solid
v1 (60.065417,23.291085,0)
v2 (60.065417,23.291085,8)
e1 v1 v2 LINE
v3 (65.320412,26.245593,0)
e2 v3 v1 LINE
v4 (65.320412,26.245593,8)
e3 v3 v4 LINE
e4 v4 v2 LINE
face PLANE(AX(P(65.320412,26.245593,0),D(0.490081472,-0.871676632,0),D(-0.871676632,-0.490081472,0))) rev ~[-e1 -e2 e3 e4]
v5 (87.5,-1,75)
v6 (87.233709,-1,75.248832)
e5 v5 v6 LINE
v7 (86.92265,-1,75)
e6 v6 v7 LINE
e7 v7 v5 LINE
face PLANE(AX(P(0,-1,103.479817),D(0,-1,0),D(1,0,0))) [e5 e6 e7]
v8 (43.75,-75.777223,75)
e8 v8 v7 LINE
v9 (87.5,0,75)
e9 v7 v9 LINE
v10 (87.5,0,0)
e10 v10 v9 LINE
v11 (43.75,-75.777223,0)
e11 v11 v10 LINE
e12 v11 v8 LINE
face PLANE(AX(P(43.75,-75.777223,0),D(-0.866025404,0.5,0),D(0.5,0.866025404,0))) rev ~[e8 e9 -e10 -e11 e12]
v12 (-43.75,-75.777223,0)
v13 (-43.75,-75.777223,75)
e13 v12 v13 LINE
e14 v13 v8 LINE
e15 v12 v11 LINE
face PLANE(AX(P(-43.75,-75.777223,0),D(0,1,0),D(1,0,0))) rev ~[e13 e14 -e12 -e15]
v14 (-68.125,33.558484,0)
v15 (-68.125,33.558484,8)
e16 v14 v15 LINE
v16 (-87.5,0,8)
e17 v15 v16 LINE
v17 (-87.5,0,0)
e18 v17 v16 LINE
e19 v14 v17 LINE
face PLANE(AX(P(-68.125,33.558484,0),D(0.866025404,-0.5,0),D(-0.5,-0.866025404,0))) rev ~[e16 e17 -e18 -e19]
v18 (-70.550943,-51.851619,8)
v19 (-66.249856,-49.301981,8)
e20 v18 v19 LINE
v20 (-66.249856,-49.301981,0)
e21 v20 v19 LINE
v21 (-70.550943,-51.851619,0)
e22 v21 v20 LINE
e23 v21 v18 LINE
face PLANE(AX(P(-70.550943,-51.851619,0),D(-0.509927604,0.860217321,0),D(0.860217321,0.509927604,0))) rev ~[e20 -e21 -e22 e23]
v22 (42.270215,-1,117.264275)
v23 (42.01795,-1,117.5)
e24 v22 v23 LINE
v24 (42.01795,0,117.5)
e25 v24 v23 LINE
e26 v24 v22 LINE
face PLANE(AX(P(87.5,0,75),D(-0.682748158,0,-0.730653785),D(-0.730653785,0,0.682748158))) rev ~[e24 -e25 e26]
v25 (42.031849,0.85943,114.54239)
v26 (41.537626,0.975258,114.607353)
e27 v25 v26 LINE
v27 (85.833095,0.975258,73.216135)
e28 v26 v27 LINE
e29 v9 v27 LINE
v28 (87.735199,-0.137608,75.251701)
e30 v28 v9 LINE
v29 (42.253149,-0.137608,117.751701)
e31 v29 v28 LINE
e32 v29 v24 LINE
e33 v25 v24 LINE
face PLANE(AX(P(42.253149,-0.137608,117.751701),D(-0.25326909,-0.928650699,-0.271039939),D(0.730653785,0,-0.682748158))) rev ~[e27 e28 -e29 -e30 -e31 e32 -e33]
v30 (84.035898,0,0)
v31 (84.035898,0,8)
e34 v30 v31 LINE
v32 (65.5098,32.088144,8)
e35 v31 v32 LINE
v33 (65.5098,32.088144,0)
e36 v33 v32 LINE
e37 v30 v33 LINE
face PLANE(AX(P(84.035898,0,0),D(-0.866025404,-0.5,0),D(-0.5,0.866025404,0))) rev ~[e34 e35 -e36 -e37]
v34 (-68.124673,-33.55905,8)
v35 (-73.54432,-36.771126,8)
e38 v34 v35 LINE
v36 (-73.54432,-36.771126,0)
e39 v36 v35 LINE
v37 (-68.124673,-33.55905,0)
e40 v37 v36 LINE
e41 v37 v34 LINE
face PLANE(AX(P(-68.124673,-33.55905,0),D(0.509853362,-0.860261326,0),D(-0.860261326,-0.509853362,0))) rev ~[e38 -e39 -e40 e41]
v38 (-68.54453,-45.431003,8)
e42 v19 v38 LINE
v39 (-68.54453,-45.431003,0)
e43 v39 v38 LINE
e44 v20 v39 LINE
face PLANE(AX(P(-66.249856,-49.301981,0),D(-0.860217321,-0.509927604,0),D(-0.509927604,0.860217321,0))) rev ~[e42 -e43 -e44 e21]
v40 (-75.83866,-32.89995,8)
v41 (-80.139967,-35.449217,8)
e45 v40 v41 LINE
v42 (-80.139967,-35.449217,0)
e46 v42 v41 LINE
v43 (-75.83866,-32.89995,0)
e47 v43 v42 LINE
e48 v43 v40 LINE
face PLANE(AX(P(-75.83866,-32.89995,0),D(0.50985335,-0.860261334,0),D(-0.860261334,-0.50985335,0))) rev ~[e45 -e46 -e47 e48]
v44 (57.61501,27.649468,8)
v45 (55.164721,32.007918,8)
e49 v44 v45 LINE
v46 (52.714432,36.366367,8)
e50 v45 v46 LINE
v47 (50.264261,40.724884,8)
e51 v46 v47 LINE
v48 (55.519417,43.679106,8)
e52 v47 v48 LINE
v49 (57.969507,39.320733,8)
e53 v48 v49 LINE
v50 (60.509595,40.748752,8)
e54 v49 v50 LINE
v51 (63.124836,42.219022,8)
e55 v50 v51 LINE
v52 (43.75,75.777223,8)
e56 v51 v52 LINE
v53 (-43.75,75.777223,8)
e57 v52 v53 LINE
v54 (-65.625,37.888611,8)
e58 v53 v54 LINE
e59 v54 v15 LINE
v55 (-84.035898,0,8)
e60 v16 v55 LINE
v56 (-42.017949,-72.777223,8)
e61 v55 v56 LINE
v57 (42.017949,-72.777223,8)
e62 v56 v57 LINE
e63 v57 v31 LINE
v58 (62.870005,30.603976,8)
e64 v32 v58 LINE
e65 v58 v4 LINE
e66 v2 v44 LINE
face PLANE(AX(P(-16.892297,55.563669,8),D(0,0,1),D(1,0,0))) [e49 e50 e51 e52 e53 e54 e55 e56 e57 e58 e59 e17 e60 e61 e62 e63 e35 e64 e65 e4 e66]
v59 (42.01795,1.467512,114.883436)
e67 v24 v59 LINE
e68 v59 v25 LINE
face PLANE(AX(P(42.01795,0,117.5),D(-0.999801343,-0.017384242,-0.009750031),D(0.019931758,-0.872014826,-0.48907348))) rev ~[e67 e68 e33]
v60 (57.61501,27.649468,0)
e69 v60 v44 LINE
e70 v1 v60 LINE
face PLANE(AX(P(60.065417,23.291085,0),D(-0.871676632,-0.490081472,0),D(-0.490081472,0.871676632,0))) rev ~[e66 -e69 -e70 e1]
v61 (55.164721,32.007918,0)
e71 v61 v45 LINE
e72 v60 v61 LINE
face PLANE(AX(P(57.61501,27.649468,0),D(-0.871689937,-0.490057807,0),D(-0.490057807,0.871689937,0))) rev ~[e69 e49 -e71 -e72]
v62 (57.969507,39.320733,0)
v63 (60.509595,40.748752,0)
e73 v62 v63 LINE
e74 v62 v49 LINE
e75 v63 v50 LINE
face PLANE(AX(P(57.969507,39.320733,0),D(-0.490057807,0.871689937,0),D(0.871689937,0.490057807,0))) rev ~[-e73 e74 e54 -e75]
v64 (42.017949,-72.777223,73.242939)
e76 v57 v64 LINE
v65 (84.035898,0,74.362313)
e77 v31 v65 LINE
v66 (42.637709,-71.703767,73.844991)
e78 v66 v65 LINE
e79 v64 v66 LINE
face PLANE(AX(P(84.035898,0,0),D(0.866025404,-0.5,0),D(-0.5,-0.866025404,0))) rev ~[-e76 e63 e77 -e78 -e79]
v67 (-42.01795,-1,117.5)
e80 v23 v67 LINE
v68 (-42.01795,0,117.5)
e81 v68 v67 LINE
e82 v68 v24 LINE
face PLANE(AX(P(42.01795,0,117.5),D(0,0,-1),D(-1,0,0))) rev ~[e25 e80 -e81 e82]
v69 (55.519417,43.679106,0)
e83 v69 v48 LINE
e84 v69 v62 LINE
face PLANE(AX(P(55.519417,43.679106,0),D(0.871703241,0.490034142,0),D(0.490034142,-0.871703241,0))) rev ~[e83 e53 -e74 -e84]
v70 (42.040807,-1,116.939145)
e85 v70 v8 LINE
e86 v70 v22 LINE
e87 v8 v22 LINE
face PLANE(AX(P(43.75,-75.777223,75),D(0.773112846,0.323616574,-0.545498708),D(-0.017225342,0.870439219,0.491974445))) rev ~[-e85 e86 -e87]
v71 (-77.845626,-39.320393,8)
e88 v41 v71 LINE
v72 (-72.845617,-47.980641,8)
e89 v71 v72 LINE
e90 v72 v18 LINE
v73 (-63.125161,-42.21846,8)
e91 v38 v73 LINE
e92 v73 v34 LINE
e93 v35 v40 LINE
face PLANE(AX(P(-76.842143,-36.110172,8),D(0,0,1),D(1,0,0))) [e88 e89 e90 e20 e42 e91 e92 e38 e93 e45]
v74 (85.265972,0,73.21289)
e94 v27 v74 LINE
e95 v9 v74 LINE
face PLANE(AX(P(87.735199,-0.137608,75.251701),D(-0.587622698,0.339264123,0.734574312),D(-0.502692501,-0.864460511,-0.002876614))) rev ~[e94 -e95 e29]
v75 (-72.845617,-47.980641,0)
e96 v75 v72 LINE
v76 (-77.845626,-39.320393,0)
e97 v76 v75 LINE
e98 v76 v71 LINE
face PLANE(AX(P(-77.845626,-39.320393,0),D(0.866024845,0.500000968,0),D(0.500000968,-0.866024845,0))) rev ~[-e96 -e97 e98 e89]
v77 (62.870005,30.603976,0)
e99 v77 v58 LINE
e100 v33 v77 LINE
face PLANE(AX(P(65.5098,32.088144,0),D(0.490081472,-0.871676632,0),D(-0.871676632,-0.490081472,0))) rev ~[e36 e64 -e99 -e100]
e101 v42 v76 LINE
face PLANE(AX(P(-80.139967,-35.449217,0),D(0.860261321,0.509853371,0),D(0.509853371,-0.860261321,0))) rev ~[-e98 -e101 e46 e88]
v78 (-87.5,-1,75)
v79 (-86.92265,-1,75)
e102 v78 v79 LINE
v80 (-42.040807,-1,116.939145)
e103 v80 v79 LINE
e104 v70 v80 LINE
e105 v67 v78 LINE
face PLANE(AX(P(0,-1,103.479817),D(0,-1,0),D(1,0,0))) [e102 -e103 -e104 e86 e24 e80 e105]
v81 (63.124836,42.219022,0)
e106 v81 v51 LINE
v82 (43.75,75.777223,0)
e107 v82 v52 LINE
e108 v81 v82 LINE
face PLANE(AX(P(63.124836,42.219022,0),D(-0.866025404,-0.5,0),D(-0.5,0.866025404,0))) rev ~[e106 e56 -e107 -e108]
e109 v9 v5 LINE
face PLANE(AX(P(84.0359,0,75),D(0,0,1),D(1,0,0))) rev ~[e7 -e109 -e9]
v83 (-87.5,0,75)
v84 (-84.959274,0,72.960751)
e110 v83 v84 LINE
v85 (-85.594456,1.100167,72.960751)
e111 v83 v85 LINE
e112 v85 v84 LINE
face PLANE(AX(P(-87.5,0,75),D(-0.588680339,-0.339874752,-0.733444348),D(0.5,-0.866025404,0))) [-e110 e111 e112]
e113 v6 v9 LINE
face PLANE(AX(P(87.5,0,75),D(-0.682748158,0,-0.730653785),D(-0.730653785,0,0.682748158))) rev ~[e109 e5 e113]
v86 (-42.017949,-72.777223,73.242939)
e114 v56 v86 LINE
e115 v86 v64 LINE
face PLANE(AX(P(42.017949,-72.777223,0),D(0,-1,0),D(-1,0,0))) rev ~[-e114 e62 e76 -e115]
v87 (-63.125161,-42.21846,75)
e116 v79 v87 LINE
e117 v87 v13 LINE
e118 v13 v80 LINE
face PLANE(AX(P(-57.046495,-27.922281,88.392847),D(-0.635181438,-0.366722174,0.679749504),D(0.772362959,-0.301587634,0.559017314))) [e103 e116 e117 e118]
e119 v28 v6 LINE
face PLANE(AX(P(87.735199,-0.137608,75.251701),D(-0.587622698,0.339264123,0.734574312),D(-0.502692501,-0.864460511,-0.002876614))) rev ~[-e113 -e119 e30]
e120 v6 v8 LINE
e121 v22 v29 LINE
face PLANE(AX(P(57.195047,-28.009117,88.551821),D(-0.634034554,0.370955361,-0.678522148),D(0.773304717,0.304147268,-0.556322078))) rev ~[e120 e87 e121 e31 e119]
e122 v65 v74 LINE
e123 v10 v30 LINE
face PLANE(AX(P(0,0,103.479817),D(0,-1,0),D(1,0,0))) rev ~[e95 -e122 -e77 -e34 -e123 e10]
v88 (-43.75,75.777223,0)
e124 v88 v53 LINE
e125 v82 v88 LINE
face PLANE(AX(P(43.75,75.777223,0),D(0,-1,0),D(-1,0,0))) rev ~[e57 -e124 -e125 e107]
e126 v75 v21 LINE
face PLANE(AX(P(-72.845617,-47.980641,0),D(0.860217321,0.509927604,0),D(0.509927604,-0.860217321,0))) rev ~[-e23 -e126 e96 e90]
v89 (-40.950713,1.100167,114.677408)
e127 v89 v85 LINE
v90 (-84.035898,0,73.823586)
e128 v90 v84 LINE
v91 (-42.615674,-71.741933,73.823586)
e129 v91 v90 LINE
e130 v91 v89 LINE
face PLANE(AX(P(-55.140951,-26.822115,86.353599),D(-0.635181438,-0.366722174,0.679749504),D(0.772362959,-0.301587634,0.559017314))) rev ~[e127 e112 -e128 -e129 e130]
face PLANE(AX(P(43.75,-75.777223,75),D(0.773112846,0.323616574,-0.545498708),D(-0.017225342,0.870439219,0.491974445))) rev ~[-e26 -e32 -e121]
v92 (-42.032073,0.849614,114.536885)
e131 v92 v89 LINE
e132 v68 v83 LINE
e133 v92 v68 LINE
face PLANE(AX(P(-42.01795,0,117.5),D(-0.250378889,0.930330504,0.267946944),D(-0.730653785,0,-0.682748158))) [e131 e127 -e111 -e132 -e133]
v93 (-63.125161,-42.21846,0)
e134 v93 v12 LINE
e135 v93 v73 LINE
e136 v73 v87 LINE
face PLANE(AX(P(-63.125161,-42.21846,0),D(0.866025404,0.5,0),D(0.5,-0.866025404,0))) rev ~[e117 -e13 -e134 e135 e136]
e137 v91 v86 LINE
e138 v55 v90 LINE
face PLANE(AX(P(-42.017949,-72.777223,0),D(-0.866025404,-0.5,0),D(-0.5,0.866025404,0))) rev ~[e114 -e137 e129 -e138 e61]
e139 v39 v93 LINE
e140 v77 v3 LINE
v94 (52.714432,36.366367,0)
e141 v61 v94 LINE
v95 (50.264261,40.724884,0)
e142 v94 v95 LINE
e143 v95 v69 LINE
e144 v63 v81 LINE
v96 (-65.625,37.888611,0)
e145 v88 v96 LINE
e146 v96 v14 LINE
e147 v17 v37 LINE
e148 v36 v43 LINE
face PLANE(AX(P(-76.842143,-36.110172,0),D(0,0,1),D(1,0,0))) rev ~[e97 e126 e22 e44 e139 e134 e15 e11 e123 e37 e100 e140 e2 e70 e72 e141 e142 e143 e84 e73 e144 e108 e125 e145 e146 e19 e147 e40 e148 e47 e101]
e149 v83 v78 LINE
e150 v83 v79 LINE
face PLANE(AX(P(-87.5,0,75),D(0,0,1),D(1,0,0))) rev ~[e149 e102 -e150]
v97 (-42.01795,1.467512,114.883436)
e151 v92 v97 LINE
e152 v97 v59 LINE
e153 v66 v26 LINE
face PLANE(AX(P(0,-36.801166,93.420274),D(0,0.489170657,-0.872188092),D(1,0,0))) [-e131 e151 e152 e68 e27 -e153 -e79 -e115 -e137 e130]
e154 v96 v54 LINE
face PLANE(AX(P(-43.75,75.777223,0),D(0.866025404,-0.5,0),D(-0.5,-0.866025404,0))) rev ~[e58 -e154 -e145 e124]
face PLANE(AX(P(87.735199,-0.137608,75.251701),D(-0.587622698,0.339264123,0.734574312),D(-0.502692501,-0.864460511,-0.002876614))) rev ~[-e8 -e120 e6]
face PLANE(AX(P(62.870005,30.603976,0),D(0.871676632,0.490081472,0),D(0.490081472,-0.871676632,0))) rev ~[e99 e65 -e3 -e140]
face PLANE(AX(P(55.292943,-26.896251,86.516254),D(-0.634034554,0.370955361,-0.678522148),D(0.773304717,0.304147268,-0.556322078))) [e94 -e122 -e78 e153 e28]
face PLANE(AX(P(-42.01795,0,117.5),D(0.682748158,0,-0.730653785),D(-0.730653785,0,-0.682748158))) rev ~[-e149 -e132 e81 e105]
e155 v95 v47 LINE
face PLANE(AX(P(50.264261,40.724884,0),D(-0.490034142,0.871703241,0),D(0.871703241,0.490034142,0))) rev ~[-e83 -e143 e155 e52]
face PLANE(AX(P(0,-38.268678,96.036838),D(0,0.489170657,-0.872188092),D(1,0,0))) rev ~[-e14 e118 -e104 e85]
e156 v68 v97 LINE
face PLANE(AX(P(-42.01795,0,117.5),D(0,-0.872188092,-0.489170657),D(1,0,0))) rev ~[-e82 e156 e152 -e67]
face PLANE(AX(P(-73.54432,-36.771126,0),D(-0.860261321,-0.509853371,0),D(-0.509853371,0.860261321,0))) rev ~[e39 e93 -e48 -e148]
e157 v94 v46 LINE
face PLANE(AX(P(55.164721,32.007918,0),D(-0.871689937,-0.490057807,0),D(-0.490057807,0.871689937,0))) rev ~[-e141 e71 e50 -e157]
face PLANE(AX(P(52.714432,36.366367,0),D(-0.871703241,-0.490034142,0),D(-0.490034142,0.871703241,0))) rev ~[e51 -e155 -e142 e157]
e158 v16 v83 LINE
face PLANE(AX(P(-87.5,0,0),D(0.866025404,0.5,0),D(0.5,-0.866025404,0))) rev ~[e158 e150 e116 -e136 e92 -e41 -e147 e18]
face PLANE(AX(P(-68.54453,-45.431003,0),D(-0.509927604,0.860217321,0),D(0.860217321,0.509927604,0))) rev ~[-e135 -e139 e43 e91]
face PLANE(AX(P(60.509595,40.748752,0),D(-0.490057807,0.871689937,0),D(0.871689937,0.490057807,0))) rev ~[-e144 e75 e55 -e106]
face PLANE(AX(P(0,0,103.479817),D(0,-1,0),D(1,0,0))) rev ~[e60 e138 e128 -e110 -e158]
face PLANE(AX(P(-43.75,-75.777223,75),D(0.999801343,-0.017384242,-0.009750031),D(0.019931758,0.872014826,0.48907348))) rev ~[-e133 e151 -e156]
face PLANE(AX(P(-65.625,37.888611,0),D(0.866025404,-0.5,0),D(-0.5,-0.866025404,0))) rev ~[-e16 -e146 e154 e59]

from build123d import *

# Parameters (mm, degrees)
F0_W      = 50
F0_H      = 12.5
F1_DEPTH  = 8
F2_DEPTH  = 75
F4_DEPTH  = 8
F7_DEPTH  = 3
F8_DEPTH  = 1
F11_DEPTH = 3
F14_DEPTH = 3
F15_DEPTH = 8
F16_DEPTH = 8


# Not quite as in the source:
# - a feature names something its author has since deleted; it is built from what else it names


with BuildPart() as f1:
    # F0 (on Top) → F1 (new body)
    with BuildSketch(Plane.XY):
        Polygon((57.9695070384, 39.3207329262), (60.5095952989, 40.7487522591), (42.0179491924, 72.7772228311), (-42.0179491924, 72.7772228311), (-84.0358983849, 0), (-42.0179491924, -72.7772228311), (42.0179491924, -72.7772228311), (84.0358983849, 0), (65.5097997054, 32.0881441788), (62.870004896, 30.6039762231), (65.3204122546, 26.2455930623), (60.0654171506, 23.2910848888), (57.615009792, 27.6494680496), (55.164720758, 32.0079177338), (52.7144317239, 36.366367418), (50.2642610162, 40.7248836223), (55.5194165334, 43.6791064608), align=None)
        with Locations((0, 54.5829171234)):
            Rectangle(F0_W, F0_H, mode=Mode.SUBTRACT)
    extrude(amount=F1_DEPTH)

    # F0 (on Top) → F2 (join)
    with BuildSketch(Plane.XY):
        Polygon((-84.0358983849, 0), (-87.5, 0), (-68.1246734519, -33.5590499945), (-63.1251610364, -42.2184595112), (-43.75, -75.7772228311), (43.75, -75.7772228311), (87.5, 0), (84.0358983849, 0), (42.0179491924, -72.7772228311), (-42.0179491924, -72.7772228311), align=None)
    extrude(amount=F2_DEPTH)

    # F0 (on Top) → F4 (join)
    with BuildSketch(Plane.XY):
        Polygon((43.75, 75.7772228311), (-43.75, 75.7772228311), (-65.625, 37.8886114156), (-68.125, 33.5584843966), (-87.5, 0), (-84.0358983849, 0), (-42.0179491924, 72.7772228311), (42.0179491924, 72.7772228311), (60.5095952989, 40.7487522591), (63.1248363216, 42.2190219338), align=None)
    extrude(amount=F4_DEPTH)

    # F6 (on face) → F7 (join)
    with BuildSketch(Plane(origin=(0, -50.1312366318, 89.3836679776), x_dir=(1, 0, 0), z_dir=(0, 0.4891706574, -0.872188092))):
        Polygon((43.75, 29.4041920927), (0, 29.4041920927), (-43.75, 29.4041920927), (-42.01795, -57.4775522498), (42.01795, -57.4775522498), align=None)
    extrude(amount=F7_DEPTH)

    # F3 (on Front) → F8 (join)
    with BuildSketch(Plane.XZ):
        Polygon((-42.01795, 114.5), (0, 114.5), (42.01795, 114.5), (84.0359, 75), (87.5, 75), (42.01795, 117.5), (0, 117.5), (-42.01795, 117.5), (-87.5, 75), (-84.0359, 75), align=None)
    extrude(amount=F8_DEPTH)

    # F10 (on face) → F11 (join)
    with BuildSketch(Plane(origin=(-67.6846727043, -39.0777640058, 72.4338274863), x_dir=(0.7723629594, -0.3015876344, 0.5590173143), z_dir=(-0.6351814378, -0.3667221741, 0.6797495039))):
        Polygon((33.2314262259, 55.789645187), (-25.6554603702, 35.6104118215), (30.9888924807, -31.0804218073), align=None)
    extrude(amount=-F11_DEPTH)

    # F13 (on face) → F14 (join)
    with BuildSketch(Plane(origin=(67.6756688636, -39.5950852503, 72.4241918832), x_dir=(0.7733047167, 0.3041472681, -0.556322078), z_dir=(-0.6340345536, 0.3709553614, -0.6785221475))):
        Polygon((-30.939509805, 30.5117392321), (-32.8751652468, -56.3649154418), (25.9400068576, -35.9776056011), align=None)
    extrude(amount=F14_DEPTH)

    # F0 (on Top) → F15 (join)
    with BuildSketch(Plane.XY):
        with Locations((0, 54.5829171234)):
            Rectangle(F0_W, F0_H)
    extrude(amount=F15_DEPTH)

    # F0 (on Top) → F16 (join)
    with BuildSketch(Plane.XY):
        Polygon((-77.8456264388, -39.3203929827), (-73.5443198074, -36.7711261738), (-75.8386599429, -32.8999502926), (-80.1399666105, -35.4492170403), align=None)
        Polygon((-63.1251610364, -42.2184595112), (-68.1246734519, -33.5590499945), (-73.5443198074, -36.7711261738), (-77.8456264388, -39.3203929827), (-72.8456167613, -47.9806414332), (-68.5445301574, -45.4310034146), align=None)
        Polygon((-66.2498559406, -49.3019813581), (-68.5445301574, -45.4310034146), (-72.8456167613, -47.9806414332), (-70.5509425445, -51.8516193767), align=None)
    extrude(amount=F16_DEPTH)


solid = f1.part
